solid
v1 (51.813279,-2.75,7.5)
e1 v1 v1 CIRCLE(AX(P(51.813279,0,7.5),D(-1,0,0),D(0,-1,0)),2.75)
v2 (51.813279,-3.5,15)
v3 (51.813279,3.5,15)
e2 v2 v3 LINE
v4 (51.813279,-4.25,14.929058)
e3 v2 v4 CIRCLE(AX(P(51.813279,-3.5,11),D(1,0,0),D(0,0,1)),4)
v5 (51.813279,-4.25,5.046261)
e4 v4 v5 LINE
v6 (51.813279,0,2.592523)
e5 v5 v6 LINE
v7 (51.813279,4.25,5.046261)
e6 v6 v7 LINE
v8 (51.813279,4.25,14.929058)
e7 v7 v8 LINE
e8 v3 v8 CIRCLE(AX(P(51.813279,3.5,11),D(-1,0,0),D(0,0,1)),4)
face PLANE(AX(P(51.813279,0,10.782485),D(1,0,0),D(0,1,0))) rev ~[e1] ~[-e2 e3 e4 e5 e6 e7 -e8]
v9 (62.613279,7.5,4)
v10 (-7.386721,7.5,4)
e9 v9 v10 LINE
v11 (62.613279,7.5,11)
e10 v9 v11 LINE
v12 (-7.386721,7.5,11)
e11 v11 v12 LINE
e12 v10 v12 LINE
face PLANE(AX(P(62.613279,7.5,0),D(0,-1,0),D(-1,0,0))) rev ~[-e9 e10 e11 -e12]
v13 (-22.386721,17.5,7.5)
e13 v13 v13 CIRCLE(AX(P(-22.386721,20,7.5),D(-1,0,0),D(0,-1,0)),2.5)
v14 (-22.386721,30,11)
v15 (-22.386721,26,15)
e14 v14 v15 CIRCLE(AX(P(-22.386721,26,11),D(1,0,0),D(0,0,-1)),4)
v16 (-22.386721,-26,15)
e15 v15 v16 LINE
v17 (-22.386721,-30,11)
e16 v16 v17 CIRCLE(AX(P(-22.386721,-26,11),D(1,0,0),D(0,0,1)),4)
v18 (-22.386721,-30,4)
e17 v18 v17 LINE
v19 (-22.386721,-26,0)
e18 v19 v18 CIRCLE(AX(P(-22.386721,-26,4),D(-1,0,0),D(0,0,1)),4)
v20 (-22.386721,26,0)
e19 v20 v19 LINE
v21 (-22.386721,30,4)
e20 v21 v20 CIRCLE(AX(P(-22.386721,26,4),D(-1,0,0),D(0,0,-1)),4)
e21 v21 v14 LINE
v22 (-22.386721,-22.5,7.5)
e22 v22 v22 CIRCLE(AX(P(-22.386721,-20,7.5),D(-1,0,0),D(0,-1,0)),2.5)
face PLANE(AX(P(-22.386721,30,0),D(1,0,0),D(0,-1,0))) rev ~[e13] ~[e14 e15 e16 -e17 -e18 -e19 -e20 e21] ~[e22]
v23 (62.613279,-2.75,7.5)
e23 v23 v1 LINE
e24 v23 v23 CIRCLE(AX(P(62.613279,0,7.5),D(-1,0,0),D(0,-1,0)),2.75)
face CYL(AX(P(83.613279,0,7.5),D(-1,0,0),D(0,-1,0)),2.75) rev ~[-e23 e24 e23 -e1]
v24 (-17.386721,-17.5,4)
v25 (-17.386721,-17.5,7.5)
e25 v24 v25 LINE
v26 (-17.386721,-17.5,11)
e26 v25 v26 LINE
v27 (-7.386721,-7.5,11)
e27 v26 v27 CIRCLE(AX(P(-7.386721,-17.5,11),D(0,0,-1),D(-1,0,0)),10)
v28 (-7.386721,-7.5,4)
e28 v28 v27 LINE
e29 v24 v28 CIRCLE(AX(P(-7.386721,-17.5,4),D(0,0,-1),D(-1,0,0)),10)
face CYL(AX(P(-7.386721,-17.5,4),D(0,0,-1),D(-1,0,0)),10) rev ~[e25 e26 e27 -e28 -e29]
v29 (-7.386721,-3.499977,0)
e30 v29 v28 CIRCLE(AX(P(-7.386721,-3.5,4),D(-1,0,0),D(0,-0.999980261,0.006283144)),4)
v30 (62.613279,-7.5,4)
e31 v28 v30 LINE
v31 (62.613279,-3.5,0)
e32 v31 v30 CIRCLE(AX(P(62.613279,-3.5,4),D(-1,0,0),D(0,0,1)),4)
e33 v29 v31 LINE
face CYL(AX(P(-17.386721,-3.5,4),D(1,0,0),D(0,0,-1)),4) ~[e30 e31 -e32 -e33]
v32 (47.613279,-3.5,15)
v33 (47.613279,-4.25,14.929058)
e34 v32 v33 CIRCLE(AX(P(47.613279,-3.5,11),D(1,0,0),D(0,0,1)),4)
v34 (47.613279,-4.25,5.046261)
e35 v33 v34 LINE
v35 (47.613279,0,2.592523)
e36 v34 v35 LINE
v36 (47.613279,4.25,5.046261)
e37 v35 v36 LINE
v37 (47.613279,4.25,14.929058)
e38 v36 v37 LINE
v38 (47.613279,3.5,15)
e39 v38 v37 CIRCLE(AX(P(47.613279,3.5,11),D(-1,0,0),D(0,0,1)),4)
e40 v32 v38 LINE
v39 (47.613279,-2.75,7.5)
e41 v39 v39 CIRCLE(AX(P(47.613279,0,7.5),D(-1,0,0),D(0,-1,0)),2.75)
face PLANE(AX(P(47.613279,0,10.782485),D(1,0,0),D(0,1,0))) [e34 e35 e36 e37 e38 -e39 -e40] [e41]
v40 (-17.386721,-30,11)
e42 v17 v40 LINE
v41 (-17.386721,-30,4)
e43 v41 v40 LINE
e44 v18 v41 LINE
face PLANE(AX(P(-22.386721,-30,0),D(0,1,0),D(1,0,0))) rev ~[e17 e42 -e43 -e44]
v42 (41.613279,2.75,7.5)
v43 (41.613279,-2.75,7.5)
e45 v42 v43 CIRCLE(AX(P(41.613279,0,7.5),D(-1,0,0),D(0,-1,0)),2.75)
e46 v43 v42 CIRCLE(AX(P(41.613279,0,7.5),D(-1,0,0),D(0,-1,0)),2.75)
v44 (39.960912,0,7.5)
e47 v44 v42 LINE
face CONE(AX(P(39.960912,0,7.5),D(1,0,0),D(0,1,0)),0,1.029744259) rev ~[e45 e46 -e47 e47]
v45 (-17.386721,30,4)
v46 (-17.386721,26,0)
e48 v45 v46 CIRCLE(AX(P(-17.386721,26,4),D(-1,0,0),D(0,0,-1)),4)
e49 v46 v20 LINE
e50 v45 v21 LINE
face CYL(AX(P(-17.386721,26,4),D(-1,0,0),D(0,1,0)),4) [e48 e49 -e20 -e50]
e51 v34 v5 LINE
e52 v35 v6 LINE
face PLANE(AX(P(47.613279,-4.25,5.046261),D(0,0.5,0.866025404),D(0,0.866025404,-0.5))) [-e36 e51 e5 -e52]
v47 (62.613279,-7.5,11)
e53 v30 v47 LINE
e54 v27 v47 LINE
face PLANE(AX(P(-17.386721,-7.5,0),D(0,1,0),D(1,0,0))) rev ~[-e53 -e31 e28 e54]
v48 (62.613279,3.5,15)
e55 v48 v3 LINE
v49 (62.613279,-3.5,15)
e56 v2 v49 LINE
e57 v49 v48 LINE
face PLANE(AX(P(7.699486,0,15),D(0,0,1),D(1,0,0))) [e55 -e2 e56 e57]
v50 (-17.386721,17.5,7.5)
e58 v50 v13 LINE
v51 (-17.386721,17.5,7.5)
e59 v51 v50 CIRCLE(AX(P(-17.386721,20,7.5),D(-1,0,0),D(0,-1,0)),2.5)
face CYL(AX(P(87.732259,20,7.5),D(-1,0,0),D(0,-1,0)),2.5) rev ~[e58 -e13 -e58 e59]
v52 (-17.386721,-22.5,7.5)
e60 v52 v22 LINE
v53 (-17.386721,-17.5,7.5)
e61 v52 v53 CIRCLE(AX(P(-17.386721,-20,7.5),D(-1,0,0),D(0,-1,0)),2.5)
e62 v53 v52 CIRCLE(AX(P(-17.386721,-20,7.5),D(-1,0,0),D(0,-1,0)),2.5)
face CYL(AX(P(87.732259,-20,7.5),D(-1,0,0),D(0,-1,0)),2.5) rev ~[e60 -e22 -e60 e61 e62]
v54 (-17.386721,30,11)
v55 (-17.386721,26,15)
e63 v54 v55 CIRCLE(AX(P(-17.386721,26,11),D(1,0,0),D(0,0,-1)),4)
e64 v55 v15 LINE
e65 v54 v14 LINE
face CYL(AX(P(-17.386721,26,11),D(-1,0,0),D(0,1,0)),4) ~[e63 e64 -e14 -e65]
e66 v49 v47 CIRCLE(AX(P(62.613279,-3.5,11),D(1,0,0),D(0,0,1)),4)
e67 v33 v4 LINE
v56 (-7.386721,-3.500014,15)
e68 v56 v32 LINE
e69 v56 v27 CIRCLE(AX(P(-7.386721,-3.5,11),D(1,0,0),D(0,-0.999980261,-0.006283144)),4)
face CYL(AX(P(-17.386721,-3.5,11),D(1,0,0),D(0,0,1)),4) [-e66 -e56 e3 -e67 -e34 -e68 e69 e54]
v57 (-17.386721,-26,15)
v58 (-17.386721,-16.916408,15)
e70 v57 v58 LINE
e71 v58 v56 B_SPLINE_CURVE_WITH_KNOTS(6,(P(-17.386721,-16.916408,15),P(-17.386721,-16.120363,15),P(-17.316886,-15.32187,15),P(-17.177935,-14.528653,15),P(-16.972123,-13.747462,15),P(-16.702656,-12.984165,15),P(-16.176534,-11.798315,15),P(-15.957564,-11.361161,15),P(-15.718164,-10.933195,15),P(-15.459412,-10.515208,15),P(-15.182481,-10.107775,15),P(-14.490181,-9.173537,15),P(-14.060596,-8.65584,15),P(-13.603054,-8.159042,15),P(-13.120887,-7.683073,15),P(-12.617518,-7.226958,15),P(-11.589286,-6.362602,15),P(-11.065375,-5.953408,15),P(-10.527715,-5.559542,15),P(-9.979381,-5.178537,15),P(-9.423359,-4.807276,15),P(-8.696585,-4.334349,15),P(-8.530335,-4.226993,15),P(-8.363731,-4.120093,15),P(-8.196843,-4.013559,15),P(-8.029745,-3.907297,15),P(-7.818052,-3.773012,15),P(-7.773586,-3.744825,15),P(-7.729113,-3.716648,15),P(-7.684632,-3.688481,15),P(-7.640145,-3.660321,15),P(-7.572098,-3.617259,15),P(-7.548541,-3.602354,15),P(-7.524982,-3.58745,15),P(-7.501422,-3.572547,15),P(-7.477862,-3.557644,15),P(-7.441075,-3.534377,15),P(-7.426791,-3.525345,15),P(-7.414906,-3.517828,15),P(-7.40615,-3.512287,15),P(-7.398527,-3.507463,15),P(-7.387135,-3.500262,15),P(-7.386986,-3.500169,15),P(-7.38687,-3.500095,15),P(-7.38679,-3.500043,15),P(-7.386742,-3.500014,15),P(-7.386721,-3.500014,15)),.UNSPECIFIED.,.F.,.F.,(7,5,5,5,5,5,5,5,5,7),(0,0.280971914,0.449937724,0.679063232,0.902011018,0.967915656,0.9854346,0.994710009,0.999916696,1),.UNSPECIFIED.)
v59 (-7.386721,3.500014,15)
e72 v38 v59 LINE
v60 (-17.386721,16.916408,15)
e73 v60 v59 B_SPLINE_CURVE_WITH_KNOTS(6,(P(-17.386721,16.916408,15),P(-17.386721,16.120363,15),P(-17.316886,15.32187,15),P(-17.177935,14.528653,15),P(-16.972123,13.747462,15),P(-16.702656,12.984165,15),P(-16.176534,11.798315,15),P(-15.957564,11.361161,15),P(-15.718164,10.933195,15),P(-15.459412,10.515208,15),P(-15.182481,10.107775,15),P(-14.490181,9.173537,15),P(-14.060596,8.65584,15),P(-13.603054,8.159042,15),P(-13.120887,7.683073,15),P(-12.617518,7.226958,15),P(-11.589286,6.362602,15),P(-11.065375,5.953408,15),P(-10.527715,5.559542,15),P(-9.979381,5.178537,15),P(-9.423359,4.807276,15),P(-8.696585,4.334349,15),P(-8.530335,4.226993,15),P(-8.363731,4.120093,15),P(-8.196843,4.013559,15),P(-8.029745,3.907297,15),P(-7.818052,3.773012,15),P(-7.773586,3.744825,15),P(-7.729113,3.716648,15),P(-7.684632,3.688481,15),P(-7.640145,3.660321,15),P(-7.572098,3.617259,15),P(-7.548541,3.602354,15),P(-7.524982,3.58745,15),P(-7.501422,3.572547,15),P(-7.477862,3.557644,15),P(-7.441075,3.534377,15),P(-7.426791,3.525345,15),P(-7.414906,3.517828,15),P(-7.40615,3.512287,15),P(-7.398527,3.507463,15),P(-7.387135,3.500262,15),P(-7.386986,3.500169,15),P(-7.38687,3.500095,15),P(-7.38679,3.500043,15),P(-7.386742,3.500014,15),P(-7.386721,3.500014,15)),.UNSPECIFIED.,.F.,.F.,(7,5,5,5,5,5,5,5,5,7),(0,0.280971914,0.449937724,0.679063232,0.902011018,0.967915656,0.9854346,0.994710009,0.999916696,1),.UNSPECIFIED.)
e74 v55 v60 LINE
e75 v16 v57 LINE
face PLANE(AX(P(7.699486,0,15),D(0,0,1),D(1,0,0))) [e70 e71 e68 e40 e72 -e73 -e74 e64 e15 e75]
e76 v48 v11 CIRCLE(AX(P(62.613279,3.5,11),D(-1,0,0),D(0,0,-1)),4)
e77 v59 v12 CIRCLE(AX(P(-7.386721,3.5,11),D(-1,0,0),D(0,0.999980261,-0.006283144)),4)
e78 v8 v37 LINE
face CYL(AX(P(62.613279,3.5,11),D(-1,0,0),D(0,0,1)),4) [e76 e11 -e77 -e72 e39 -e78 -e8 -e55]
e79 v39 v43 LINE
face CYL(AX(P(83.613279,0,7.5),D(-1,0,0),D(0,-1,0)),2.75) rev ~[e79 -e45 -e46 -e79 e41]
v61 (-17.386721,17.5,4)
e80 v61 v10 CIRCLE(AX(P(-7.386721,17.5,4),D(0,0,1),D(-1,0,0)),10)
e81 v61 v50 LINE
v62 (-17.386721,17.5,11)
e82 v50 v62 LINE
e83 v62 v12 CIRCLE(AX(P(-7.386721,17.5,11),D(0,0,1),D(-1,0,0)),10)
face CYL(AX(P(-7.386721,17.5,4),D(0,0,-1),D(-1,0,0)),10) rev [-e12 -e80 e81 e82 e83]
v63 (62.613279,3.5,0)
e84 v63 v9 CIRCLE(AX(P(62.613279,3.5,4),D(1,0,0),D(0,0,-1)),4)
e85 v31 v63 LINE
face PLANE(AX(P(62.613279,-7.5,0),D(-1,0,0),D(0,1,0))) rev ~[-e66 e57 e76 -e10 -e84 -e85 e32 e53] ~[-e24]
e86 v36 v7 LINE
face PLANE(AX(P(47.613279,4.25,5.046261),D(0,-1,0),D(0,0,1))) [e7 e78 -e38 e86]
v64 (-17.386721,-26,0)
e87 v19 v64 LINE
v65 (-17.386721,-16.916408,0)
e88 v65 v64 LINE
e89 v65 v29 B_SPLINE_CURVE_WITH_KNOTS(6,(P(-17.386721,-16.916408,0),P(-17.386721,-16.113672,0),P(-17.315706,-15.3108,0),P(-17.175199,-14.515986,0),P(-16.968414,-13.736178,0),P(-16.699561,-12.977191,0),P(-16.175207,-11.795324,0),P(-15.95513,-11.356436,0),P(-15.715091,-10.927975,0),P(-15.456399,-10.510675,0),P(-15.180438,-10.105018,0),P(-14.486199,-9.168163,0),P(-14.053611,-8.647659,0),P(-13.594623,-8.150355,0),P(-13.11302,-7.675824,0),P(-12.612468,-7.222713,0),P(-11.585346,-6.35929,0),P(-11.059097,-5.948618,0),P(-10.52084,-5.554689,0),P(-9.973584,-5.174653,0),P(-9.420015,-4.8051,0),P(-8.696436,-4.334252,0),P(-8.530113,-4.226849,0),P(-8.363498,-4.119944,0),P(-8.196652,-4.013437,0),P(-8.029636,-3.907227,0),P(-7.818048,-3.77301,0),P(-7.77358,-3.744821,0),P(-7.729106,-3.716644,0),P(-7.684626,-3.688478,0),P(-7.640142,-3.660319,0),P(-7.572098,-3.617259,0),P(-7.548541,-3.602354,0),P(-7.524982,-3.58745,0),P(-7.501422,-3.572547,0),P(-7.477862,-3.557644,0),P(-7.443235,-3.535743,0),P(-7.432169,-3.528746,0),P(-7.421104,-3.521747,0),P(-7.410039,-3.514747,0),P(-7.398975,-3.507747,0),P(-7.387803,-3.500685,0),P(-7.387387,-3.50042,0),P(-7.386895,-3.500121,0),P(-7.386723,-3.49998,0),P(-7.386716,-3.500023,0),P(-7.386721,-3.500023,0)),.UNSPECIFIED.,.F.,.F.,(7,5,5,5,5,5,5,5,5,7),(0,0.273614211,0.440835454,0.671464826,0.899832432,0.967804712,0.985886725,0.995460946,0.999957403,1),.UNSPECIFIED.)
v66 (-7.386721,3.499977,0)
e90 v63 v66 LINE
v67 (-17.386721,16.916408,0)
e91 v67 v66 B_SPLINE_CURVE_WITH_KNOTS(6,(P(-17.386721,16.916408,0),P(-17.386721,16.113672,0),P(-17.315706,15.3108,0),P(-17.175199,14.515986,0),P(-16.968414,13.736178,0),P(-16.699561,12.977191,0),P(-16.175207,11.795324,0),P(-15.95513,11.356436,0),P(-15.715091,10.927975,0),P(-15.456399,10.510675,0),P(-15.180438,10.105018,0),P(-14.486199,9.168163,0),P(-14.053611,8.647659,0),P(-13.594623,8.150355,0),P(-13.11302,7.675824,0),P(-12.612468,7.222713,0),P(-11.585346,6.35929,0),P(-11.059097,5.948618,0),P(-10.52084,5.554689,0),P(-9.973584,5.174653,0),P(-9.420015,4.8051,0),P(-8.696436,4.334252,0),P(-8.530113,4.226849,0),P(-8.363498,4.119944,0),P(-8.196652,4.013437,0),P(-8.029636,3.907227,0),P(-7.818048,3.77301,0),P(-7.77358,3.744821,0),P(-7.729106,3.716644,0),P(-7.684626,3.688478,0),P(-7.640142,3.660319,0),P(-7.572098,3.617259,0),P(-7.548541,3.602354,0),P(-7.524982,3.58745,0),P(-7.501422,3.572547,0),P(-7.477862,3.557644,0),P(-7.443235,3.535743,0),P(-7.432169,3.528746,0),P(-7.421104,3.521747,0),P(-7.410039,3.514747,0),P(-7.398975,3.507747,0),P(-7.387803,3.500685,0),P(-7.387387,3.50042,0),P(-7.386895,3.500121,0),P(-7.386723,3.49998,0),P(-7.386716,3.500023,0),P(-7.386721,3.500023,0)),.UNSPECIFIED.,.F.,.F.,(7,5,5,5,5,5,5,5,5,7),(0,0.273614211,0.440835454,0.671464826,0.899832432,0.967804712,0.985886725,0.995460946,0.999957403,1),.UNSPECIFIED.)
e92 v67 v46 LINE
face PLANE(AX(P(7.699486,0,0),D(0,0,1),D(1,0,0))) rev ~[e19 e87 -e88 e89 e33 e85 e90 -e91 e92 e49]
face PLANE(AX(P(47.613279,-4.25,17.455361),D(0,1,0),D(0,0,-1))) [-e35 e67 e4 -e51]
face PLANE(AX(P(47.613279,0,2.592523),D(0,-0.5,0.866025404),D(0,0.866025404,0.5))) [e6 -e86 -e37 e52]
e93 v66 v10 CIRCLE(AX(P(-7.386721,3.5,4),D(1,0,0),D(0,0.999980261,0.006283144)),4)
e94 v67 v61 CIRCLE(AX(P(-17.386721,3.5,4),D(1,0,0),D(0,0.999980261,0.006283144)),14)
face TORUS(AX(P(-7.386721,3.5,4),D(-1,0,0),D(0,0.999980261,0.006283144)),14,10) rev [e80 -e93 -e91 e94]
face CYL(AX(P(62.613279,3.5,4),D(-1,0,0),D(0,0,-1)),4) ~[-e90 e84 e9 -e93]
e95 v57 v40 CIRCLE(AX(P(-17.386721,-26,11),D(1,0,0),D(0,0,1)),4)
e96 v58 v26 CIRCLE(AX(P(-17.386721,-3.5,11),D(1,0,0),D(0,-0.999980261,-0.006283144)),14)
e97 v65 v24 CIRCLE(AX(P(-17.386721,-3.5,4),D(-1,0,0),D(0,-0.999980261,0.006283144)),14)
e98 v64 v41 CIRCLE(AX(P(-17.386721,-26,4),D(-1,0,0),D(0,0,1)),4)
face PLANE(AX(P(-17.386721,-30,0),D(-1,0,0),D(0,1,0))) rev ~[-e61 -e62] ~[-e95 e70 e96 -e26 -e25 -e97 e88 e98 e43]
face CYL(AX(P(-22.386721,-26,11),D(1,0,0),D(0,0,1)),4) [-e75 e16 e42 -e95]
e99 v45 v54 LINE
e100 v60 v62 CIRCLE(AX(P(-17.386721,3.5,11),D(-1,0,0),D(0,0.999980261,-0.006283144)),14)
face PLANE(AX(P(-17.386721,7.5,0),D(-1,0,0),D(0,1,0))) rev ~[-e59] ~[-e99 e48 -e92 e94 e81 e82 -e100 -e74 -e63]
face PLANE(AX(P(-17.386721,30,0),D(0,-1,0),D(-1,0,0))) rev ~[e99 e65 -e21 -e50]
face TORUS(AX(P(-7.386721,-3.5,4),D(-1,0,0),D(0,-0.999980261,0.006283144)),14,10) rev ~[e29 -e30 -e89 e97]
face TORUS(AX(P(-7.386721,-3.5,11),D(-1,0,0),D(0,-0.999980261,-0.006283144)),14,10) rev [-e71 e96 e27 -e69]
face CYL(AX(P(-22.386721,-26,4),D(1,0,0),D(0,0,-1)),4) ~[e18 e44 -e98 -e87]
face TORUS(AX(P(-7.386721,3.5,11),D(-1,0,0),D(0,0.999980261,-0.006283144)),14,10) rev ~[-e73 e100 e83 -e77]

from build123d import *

# Parameters (mm, degrees)
F1_DEPTH     = 15
F3_D         = 5.5
F3_DEPTH     = 21
F3_TIP       = 1.6523667023
F5_D         = 5
F6_R         = 4
F7_T1_DEPTH  = 7
F7_T6_ANGLE  = 359.64
F7_T12_ANGLE = 359.64
F7_T18_ANGLE = 359.64
F7_T24_ANGLE = 359.64
F10_DEPTH    = 4.2


# Not quite as in the source:
# - a fillet or chamfer that OpenCascade refuses, or shapes differently, is made with other operations: its cross-section is extruded or revolved along the edge and cut away or added


with BuildPart() as f1:
    # F0 (on Top) → F1 (new body)
    with BuildSketch(Plane.XY):
        Polygon((-17.3867209846, 30), (-22.3867209846, 30), (-22.3867209846, -30), (-17.3867209846, -30), (-17.3867209846, -7.5), (62.6132790154, -7.5), (62.6132790154, 7.5), (-17.3867209846, 7.5), align=None)
    extrude(amount=F1_DEPTH)

    # F3
    with Locations(Plane.YZ.offset(62.6132790154)):
        with Locations((0, 7.5)):
            Hole(F3_D / 2, depth=F3_DEPTH)
            with Locations((0, 0, -(F3_DEPTH + F3_TIP / 2))):  # 118° drill point
                Cone(0, F3_D / 2, F3_TIP, mode=Mode.SUBTRACT)

    # F5 (through all)
    with Locations(Plane.YZ.offset(-17.3867209846)):
        with Locations((-20, 7.5), (20, 7.5)):
            Hole(F5_D / 2)

    # F6
    f6_edges = [f1.edges().sort_by_distance(p)[0] for p in [
        (22.613279, -7.5, 15),
        (22.613279, 7.5, 15),
        (22.613279, -7.5, 0),
        (22.613279, 7.5, 0),
        (-19.886721, -30, 15),
        (-19.886721, -30, 0),
        (-19.886721, 30, 15),
        (-19.886721, 30, 0),
    ]]
    fillet(f6_edges, radius=F6_R)

    # F7: fillet of radius 10 on 2 edges, made by hand

    # F7_s2 → F7_t1 (join)
    with BuildSketch(Plane.XY.offset(4)):
        with BuildLine():
            ThreePointArc((-17.3867209846, -17.5), (-14.4577887965, -10.4289321881), (-7.3867209846, -7.5))
            Line((-7.3867209846, -7.5), (-17.3867209846, -7.5))
            Line((-17.3867209846, -7.5), (-17.3867209846, -17.5))
        make_face()
        with BuildLine():
            ThreePointArc((-17.3867209846, 17.5), (-14.4577887965, 10.4289321881), (-7.3867209846, 7.5))
            Line((-7.3867209846, 7.5), (-17.3867209846, 7.5))
            Line((-17.3867209846, 7.5), (-17.3867209846, 17.5))
        make_face()
    extrude(amount=F7_T1_DEPTH)


with BuildPart() as f7_tool4:
    # F7_s5 → F7_t6 (revolve)
    with BuildSketch(Plane(origin=(0, -0.0249939071, 3.9778515186), x_dir=(1, 0, 0), z_dir=(0, 0.006283144, -0.9999802609))):
        with BuildLine():
            ThreePointArc((-17.3867209846, -17.5250634889), (-14.4577887965, -10.453995677), (-7.3867209846, -7.5250634889))
            Line((-7.3867209846, -7.5250634889), (-17.3867209846, -7.5250634889))
            Line((-17.3867209846, -7.5250634889), (-17.3867209846, -17.5250634889))
        make_face()
    revolve(axis=Axis((-17.3867209846, 3.5, 4), (1, 0, 0)), revolution_arc=F7_T6_ANGLE)

    split(bisect_by=Plane.XY, keep=Keep.TOP)

    split(bisect_by=Plane.XY.offset(15), keep=Keep.BOTTOM)


with BuildPart() as f1_1:
    add(f1.part)

    # F7_t3: union F7_tool4
    add(f7_tool4.part)


with BuildPart() as f7_tool10:
    # F7_s11 → F7_t12 (revolve)
    with BuildSketch(Plane(origin=(0, 0.069251392, 11.0215563129), x_dir=(1, 0, 0), z_dir=(0, 0.006283144, 0.9999802609))):
        with BuildLine():
            ThreePointArc((-17.3867209846, 17.4308163294), (-14.4577887965, 10.3597485175), (-7.3867209846, 7.4308163294))
            Line((-7.3867209846, 7.4308163294), (-17.3867209846, 7.4308163294))
            Line((-17.3867209846, 7.4308163294), (-17.3867209846, 17.4308163294))
        make_face()
    revolve(axis=Axis((-17.3867209846, 3.5, 11), (-1, 0, 0)), revolution_arc=F7_T12_ANGLE)

    split(bisect_by=Plane.XY, keep=Keep.TOP)

    split(bisect_by=Plane.XY.offset(15), keep=Keep.BOTTOM)


with BuildPart() as f1_2:
    add(f1_1.part)

    # F7_t9: union F7_tool10
    add(f7_tool10.part)


with BuildPart() as f7_tool16:
    # F7_s17 → F7_t18 (revolve)
    with BuildSketch(Plane(origin=(0, 0.0249939071, 3.9778515186), x_dir=(1, 0, 0), z_dir=(0, -0.006283144, -0.9999802609))):
        with BuildLine():
            ThreePointArc((-17.3867209846, 17.5250634889), (-14.4577887965, 10.453995677), (-7.3867209846, 7.5250634889))
            Line((-7.3867209846, 7.5250634889), (-17.3867209846, 7.5250634889))
            Line((-17.3867209846, 7.5250634889), (-17.3867209846, 17.5250634889))
        make_face()
    revolve(axis=Axis((-17.3867209846, -3.5, 4), (-1, 0, 0)), revolution_arc=F7_T18_ANGLE)

    split(bisect_by=Plane.XY, keep=Keep.TOP)

    split(bisect_by=Plane.XY.offset(15), keep=Keep.BOTTOM)


with BuildPart() as f1_3:
    add(f1_2.part)

    # F7_t15: union F7_tool16
    add(f7_tool16.part)


with BuildPart() as f7_tool22:
    # F7_s23 → F7_t24 (revolve)
    with BuildSketch(Plane(origin=(0, -0.069251392, 11.0215563129), x_dir=(1, 0, 0), z_dir=(0, -0.006283144, 0.9999802609))):
        with BuildLine():
            ThreePointArc((-17.3867209846, -17.4308163294), (-14.4577887965, -10.3597485175), (-7.3867209846, -7.4308163294))
            Line((-7.3867209846, -7.4308163294), (-17.3867209846, -7.4308163294))
            Line((-17.3867209846, -7.4308163294), (-17.3867209846, -17.4308163294))
        make_face()
    revolve(axis=Axis((-17.3867209846, -3.5, 11), (1, 0, 0)), revolution_arc=F7_T24_ANGLE)

    split(bisect_by=Plane.XY, keep=Keep.TOP)

    split(bisect_by=Plane.XY.offset(15), keep=Keep.BOTTOM)


with BuildPart() as f1_4:
    add(f1_3.part)

    # F7_t21: union F7_tool22
    add(f7_tool22.part)

    # F9 (on offset) → F10 (cut)
    with BuildSketch(Plane.YZ.offset(47.6132790154)):
        Polygon((0, 2.5925227119), (4.25, 5.0462613559), (4.25, 9.9537386441), (4.25, 17.4553611223), (-4.25, 17.4553611223), (-4.25, 9.9537386441), (-4.25, 5.0462613559), align=None)
    extrude(amount=F10_DEPTH, mode=Mode.SUBTRACT)


solid = f1_4.part
